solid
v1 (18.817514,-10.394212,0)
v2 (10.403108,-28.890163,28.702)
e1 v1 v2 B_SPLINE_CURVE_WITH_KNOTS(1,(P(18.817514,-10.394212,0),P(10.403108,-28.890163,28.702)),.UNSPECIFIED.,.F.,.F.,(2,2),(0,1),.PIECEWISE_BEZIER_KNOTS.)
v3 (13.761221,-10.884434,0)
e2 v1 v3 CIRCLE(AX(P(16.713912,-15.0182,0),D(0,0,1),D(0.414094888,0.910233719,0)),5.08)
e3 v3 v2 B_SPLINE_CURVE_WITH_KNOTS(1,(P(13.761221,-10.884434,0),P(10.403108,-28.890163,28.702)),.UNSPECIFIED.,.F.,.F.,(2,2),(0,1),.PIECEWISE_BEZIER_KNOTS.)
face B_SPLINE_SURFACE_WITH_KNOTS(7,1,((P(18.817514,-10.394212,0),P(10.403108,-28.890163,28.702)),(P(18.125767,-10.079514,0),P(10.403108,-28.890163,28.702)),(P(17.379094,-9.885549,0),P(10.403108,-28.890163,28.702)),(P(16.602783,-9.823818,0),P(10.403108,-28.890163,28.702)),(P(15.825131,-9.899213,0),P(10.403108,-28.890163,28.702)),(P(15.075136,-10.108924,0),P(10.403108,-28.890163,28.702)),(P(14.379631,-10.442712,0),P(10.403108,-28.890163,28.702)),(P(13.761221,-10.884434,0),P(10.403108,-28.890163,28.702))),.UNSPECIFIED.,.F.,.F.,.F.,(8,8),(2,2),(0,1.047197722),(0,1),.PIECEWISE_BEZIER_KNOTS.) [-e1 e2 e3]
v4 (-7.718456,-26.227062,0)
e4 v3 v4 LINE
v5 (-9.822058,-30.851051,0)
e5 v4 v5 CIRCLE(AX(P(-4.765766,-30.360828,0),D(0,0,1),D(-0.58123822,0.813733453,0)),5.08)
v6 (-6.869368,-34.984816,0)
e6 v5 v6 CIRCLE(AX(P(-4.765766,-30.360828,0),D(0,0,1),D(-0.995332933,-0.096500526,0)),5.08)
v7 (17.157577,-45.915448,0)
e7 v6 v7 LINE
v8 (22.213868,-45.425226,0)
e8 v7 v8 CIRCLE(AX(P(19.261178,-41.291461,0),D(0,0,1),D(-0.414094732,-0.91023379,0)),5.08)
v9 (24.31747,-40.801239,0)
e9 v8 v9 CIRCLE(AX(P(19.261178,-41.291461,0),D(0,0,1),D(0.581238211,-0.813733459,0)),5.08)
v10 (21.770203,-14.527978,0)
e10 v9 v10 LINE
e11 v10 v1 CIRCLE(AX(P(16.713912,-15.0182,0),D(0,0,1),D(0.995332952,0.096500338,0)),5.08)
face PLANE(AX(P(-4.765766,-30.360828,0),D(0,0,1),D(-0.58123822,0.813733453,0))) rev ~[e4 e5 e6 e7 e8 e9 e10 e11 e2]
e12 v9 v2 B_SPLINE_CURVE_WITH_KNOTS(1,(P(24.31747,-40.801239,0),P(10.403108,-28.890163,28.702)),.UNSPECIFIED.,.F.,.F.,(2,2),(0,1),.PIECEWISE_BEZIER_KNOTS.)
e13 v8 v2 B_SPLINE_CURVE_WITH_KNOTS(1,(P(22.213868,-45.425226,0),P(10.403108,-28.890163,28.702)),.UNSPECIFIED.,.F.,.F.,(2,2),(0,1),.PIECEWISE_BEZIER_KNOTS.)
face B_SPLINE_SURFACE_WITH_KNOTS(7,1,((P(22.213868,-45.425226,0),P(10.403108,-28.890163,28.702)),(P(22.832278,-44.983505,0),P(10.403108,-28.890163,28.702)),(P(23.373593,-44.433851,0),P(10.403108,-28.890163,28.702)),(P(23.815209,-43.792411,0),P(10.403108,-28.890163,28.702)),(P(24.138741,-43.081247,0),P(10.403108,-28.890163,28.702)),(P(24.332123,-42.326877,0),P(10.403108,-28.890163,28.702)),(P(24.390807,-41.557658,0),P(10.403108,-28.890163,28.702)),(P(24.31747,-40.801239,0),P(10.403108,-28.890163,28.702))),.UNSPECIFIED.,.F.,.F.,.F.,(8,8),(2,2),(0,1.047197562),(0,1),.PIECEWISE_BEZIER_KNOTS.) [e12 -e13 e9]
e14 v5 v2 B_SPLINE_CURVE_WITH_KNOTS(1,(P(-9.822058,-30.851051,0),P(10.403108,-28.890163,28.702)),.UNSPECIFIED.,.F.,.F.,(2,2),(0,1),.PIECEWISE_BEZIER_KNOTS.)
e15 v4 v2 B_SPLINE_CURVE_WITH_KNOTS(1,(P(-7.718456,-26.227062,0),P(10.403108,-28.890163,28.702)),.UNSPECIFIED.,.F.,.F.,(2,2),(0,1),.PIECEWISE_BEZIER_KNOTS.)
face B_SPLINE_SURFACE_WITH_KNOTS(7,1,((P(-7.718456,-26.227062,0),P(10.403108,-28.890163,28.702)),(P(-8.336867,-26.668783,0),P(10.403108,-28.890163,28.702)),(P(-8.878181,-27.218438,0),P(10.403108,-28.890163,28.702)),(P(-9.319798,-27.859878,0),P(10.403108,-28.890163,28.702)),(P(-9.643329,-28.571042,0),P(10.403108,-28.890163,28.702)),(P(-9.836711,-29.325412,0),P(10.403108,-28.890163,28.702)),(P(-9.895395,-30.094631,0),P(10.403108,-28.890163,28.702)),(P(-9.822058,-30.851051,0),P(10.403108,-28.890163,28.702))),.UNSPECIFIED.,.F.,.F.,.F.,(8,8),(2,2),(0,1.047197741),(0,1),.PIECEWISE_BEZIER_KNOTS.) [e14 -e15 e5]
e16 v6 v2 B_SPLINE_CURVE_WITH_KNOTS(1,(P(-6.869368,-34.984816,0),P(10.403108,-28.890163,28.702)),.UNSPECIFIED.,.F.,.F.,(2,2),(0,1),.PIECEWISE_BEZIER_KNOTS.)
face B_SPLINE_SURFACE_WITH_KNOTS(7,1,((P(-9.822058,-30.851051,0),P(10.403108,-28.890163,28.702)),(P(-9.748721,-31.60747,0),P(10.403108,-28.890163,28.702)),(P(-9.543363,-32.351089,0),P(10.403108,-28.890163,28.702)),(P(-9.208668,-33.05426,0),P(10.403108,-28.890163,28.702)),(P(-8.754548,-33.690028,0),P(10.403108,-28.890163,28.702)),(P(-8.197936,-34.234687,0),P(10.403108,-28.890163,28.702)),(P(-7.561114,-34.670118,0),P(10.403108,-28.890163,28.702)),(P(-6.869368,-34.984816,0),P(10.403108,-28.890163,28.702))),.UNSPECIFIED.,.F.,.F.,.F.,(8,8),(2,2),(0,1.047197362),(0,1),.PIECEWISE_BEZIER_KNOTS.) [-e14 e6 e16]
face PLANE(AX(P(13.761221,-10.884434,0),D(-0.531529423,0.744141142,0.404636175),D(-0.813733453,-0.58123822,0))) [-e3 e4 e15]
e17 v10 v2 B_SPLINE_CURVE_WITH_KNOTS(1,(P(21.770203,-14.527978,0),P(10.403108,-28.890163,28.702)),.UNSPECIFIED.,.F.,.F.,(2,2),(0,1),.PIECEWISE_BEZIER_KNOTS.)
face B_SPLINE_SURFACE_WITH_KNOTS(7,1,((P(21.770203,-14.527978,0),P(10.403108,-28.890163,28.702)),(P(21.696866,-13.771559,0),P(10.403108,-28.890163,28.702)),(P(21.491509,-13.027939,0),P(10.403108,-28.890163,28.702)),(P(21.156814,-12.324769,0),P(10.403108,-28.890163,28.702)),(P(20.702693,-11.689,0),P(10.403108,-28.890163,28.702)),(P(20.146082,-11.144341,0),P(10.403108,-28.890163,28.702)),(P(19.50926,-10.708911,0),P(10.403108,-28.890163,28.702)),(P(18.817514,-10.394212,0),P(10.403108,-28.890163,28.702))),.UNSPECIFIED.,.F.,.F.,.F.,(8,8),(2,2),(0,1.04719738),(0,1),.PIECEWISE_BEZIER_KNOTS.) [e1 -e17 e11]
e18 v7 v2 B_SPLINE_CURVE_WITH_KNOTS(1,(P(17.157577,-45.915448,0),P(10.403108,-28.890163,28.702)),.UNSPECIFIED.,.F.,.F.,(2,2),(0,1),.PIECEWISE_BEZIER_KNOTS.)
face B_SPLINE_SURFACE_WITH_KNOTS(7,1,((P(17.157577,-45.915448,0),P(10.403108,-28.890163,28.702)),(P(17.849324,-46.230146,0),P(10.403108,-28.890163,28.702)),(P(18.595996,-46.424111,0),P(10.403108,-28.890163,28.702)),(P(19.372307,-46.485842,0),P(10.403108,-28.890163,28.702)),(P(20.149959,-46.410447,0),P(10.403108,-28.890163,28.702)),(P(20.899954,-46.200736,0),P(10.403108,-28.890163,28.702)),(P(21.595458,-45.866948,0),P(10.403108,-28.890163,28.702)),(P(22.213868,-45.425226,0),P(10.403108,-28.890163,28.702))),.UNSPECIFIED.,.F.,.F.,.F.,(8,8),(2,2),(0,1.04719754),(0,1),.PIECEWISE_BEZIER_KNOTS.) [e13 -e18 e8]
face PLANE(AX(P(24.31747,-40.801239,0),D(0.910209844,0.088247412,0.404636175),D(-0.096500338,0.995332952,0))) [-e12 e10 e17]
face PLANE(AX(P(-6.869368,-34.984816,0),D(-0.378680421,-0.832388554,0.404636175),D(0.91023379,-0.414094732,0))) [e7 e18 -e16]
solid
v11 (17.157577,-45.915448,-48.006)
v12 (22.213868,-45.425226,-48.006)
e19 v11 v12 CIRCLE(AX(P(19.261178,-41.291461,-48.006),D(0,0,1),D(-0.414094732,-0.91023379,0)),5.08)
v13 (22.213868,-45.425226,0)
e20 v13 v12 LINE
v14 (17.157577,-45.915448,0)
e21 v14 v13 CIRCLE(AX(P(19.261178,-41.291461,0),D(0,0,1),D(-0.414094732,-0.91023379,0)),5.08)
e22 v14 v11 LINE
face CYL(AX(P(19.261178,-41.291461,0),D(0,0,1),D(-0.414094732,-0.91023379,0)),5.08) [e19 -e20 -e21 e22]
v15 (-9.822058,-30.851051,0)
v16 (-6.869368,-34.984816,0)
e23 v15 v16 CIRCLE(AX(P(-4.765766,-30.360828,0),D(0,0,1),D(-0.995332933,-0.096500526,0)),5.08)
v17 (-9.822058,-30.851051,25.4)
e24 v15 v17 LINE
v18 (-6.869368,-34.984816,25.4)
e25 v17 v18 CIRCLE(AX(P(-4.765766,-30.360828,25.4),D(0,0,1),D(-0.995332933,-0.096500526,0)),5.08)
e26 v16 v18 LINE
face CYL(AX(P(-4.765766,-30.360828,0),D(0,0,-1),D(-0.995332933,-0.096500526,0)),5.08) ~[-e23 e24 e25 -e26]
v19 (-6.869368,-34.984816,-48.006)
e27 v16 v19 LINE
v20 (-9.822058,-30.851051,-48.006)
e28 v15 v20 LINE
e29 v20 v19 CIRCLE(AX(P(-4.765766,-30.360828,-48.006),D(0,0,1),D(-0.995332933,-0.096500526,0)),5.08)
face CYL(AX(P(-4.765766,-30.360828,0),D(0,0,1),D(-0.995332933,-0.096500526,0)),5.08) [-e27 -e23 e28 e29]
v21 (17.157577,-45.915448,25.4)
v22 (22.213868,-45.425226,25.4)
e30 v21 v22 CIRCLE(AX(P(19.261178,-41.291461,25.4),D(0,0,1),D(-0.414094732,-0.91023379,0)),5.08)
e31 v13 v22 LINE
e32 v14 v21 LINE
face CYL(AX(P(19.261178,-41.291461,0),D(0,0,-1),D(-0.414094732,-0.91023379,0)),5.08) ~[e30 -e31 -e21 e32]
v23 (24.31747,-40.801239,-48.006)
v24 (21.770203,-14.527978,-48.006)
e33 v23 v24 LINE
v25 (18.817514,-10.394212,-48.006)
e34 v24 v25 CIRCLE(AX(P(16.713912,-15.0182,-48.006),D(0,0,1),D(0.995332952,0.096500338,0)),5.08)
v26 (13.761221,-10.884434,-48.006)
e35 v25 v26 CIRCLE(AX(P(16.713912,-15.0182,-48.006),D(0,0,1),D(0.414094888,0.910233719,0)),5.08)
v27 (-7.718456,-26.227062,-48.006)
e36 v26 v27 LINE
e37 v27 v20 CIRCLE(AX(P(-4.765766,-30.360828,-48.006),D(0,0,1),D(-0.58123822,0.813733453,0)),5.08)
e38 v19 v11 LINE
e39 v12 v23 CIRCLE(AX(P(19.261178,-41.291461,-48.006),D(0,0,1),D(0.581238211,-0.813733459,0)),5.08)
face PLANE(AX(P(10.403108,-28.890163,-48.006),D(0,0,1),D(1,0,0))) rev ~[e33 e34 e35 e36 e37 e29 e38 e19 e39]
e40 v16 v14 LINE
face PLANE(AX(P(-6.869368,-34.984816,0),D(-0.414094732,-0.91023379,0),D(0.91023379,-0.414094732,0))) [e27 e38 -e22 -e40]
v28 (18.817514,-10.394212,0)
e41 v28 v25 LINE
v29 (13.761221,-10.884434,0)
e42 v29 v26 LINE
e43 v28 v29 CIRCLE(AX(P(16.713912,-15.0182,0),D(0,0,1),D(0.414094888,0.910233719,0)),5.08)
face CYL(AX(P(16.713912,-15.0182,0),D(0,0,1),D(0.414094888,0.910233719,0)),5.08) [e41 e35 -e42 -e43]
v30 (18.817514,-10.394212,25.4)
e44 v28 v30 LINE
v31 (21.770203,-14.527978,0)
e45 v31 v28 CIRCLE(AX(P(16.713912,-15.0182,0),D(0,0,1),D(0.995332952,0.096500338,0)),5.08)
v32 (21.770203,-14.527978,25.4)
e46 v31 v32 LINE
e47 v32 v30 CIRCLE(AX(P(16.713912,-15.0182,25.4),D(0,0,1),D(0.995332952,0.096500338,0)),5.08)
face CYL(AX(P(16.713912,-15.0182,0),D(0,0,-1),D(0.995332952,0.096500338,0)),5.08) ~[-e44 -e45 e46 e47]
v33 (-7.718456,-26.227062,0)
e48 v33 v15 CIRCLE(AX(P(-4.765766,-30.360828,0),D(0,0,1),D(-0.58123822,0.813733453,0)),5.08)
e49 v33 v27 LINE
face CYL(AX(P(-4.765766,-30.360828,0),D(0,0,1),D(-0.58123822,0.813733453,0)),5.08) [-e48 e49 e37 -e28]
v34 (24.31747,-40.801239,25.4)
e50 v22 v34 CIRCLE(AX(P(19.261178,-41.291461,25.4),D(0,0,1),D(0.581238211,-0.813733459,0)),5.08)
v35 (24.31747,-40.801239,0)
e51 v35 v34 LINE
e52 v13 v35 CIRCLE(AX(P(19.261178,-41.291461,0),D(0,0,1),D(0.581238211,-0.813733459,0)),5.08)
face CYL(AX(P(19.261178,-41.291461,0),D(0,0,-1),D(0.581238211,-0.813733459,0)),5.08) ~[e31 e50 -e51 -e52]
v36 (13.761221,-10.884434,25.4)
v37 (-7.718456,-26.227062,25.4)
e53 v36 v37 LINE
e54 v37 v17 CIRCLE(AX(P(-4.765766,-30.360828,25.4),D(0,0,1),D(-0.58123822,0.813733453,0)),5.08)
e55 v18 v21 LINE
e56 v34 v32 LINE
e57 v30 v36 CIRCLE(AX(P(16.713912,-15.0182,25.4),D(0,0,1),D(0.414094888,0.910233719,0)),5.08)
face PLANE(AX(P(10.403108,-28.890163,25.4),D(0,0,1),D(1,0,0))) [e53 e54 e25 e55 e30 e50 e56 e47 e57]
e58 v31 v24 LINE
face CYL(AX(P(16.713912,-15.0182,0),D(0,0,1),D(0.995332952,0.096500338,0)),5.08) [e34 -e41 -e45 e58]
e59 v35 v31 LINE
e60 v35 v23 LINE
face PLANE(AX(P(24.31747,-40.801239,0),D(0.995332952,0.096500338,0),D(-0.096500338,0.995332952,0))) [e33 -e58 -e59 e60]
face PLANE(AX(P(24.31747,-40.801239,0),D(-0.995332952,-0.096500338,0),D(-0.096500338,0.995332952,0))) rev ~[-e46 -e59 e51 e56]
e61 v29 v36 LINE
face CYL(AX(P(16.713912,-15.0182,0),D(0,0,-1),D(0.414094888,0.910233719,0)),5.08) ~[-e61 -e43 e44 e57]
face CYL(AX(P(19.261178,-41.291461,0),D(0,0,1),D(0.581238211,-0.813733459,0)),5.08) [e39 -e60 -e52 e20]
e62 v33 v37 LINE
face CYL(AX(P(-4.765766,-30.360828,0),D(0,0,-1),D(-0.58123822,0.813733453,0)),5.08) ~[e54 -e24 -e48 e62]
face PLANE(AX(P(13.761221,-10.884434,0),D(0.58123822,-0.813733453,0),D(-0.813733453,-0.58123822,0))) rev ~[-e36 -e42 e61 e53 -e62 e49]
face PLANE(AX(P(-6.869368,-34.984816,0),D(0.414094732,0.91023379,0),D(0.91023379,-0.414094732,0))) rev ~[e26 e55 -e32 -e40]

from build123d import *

# Parameters (mm, degrees)
F4_DEPTH      = 48.006
F4_DEPTH_BACK = 25.4


# Not quite as in the source:
# - a feature of the source that left no trace in its solid (it failed there, or was rolled back) is left out


with BuildPart() as f3:
    # F0 (on Top) → F3 section 0
    with BuildSketch(Plane.XY, mode=Mode.PRIVATE) as f3_s0:
        with BuildLine():
            Line((13.7612214115, -10.8844338036), (-7.7184564891, -26.2270619124))
            ThreePointArc((-7.7184564891, -26.2270619124), (-9.3897541869, -28.2572270517), (-9.8220576348, -30.8510505261))
            ThreePointArc((-9.8220576348, -30.8510505261), (-8.8995319922, -33.3135184001), (-6.8693675716, -34.9848155062))
            Line((-6.8693675716, -34.9848155062), (17.1575770817, -45.9154481789))
            ThreePointArc((17.1575770817, -45.9154481789), (19.7514000081, -46.347751922), (22.2138684317, -45.4252264958))
            ThreePointArc((22.2138684317, -45.4252264958), (23.8851659635, -43.3950617882), (24.3174697153, -40.8012388093))
            Line((24.3174697153, -40.8012388093), (21.7702029626, -14.5279780279))
            ThreePointArc((21.7702029626, -14.5279780279), (20.8476777597, -12.0655099404), (18.8175135976, -10.3942124484))
            ThreePointArc((18.8175135976, -10.3942124484), (16.2236902852, -9.9619083061), (13.7612214115, -10.8844338036))
        make_face()
    loft([f3_s0.sketch, Vertex(10.4031078517, -28.8901627064, 28.702)])


with BuildPart() as f4:
    # F0 (on Top) → F4 (new body, two sides)
    with BuildSketch(Plane.XY) as f4_sk:
        with BuildLine():
            Line((13.7612214115, -10.8844338036), (-7.7184564891, -26.2270619124))
            ThreePointArc((-7.7184564891, -26.2270619124), (-9.3897541869, -28.2572270517), (-9.8220576348, -30.8510505261))
            ThreePointArc((-9.8220576348, -30.8510505261), (-8.8995319922, -33.3135184001), (-6.8693675716, -34.9848155062))
            Line((-6.8693675716, -34.9848155062), (17.1575770817, -45.9154481789))
            ThreePointArc((17.1575770817, -45.9154481789), (19.7514000081, -46.347751922), (22.2138684317, -45.4252264958))
            ThreePointArc((22.2138684317, -45.4252264958), (23.8851659635, -43.3950617882), (24.3174697153, -40.8012388093))
            Line((24.3174697153, -40.8012388093), (21.7702029626, -14.5279780279))
            ThreePointArc((21.7702029626, -14.5279780279), (20.8476777597, -12.0655099404), (18.8175135976, -10.3942124484))
            ThreePointArc((18.8175135976, -10.3942124484), (16.2236902852, -9.9619083061), (13.7612214115, -10.8844338036))
        make_face()
    extrude(amount=-F4_DEPTH)
    extrude(f4_sk.sketch, amount=F4_DEPTH_BACK)


solid = Compound([f3.part, f4.part])
